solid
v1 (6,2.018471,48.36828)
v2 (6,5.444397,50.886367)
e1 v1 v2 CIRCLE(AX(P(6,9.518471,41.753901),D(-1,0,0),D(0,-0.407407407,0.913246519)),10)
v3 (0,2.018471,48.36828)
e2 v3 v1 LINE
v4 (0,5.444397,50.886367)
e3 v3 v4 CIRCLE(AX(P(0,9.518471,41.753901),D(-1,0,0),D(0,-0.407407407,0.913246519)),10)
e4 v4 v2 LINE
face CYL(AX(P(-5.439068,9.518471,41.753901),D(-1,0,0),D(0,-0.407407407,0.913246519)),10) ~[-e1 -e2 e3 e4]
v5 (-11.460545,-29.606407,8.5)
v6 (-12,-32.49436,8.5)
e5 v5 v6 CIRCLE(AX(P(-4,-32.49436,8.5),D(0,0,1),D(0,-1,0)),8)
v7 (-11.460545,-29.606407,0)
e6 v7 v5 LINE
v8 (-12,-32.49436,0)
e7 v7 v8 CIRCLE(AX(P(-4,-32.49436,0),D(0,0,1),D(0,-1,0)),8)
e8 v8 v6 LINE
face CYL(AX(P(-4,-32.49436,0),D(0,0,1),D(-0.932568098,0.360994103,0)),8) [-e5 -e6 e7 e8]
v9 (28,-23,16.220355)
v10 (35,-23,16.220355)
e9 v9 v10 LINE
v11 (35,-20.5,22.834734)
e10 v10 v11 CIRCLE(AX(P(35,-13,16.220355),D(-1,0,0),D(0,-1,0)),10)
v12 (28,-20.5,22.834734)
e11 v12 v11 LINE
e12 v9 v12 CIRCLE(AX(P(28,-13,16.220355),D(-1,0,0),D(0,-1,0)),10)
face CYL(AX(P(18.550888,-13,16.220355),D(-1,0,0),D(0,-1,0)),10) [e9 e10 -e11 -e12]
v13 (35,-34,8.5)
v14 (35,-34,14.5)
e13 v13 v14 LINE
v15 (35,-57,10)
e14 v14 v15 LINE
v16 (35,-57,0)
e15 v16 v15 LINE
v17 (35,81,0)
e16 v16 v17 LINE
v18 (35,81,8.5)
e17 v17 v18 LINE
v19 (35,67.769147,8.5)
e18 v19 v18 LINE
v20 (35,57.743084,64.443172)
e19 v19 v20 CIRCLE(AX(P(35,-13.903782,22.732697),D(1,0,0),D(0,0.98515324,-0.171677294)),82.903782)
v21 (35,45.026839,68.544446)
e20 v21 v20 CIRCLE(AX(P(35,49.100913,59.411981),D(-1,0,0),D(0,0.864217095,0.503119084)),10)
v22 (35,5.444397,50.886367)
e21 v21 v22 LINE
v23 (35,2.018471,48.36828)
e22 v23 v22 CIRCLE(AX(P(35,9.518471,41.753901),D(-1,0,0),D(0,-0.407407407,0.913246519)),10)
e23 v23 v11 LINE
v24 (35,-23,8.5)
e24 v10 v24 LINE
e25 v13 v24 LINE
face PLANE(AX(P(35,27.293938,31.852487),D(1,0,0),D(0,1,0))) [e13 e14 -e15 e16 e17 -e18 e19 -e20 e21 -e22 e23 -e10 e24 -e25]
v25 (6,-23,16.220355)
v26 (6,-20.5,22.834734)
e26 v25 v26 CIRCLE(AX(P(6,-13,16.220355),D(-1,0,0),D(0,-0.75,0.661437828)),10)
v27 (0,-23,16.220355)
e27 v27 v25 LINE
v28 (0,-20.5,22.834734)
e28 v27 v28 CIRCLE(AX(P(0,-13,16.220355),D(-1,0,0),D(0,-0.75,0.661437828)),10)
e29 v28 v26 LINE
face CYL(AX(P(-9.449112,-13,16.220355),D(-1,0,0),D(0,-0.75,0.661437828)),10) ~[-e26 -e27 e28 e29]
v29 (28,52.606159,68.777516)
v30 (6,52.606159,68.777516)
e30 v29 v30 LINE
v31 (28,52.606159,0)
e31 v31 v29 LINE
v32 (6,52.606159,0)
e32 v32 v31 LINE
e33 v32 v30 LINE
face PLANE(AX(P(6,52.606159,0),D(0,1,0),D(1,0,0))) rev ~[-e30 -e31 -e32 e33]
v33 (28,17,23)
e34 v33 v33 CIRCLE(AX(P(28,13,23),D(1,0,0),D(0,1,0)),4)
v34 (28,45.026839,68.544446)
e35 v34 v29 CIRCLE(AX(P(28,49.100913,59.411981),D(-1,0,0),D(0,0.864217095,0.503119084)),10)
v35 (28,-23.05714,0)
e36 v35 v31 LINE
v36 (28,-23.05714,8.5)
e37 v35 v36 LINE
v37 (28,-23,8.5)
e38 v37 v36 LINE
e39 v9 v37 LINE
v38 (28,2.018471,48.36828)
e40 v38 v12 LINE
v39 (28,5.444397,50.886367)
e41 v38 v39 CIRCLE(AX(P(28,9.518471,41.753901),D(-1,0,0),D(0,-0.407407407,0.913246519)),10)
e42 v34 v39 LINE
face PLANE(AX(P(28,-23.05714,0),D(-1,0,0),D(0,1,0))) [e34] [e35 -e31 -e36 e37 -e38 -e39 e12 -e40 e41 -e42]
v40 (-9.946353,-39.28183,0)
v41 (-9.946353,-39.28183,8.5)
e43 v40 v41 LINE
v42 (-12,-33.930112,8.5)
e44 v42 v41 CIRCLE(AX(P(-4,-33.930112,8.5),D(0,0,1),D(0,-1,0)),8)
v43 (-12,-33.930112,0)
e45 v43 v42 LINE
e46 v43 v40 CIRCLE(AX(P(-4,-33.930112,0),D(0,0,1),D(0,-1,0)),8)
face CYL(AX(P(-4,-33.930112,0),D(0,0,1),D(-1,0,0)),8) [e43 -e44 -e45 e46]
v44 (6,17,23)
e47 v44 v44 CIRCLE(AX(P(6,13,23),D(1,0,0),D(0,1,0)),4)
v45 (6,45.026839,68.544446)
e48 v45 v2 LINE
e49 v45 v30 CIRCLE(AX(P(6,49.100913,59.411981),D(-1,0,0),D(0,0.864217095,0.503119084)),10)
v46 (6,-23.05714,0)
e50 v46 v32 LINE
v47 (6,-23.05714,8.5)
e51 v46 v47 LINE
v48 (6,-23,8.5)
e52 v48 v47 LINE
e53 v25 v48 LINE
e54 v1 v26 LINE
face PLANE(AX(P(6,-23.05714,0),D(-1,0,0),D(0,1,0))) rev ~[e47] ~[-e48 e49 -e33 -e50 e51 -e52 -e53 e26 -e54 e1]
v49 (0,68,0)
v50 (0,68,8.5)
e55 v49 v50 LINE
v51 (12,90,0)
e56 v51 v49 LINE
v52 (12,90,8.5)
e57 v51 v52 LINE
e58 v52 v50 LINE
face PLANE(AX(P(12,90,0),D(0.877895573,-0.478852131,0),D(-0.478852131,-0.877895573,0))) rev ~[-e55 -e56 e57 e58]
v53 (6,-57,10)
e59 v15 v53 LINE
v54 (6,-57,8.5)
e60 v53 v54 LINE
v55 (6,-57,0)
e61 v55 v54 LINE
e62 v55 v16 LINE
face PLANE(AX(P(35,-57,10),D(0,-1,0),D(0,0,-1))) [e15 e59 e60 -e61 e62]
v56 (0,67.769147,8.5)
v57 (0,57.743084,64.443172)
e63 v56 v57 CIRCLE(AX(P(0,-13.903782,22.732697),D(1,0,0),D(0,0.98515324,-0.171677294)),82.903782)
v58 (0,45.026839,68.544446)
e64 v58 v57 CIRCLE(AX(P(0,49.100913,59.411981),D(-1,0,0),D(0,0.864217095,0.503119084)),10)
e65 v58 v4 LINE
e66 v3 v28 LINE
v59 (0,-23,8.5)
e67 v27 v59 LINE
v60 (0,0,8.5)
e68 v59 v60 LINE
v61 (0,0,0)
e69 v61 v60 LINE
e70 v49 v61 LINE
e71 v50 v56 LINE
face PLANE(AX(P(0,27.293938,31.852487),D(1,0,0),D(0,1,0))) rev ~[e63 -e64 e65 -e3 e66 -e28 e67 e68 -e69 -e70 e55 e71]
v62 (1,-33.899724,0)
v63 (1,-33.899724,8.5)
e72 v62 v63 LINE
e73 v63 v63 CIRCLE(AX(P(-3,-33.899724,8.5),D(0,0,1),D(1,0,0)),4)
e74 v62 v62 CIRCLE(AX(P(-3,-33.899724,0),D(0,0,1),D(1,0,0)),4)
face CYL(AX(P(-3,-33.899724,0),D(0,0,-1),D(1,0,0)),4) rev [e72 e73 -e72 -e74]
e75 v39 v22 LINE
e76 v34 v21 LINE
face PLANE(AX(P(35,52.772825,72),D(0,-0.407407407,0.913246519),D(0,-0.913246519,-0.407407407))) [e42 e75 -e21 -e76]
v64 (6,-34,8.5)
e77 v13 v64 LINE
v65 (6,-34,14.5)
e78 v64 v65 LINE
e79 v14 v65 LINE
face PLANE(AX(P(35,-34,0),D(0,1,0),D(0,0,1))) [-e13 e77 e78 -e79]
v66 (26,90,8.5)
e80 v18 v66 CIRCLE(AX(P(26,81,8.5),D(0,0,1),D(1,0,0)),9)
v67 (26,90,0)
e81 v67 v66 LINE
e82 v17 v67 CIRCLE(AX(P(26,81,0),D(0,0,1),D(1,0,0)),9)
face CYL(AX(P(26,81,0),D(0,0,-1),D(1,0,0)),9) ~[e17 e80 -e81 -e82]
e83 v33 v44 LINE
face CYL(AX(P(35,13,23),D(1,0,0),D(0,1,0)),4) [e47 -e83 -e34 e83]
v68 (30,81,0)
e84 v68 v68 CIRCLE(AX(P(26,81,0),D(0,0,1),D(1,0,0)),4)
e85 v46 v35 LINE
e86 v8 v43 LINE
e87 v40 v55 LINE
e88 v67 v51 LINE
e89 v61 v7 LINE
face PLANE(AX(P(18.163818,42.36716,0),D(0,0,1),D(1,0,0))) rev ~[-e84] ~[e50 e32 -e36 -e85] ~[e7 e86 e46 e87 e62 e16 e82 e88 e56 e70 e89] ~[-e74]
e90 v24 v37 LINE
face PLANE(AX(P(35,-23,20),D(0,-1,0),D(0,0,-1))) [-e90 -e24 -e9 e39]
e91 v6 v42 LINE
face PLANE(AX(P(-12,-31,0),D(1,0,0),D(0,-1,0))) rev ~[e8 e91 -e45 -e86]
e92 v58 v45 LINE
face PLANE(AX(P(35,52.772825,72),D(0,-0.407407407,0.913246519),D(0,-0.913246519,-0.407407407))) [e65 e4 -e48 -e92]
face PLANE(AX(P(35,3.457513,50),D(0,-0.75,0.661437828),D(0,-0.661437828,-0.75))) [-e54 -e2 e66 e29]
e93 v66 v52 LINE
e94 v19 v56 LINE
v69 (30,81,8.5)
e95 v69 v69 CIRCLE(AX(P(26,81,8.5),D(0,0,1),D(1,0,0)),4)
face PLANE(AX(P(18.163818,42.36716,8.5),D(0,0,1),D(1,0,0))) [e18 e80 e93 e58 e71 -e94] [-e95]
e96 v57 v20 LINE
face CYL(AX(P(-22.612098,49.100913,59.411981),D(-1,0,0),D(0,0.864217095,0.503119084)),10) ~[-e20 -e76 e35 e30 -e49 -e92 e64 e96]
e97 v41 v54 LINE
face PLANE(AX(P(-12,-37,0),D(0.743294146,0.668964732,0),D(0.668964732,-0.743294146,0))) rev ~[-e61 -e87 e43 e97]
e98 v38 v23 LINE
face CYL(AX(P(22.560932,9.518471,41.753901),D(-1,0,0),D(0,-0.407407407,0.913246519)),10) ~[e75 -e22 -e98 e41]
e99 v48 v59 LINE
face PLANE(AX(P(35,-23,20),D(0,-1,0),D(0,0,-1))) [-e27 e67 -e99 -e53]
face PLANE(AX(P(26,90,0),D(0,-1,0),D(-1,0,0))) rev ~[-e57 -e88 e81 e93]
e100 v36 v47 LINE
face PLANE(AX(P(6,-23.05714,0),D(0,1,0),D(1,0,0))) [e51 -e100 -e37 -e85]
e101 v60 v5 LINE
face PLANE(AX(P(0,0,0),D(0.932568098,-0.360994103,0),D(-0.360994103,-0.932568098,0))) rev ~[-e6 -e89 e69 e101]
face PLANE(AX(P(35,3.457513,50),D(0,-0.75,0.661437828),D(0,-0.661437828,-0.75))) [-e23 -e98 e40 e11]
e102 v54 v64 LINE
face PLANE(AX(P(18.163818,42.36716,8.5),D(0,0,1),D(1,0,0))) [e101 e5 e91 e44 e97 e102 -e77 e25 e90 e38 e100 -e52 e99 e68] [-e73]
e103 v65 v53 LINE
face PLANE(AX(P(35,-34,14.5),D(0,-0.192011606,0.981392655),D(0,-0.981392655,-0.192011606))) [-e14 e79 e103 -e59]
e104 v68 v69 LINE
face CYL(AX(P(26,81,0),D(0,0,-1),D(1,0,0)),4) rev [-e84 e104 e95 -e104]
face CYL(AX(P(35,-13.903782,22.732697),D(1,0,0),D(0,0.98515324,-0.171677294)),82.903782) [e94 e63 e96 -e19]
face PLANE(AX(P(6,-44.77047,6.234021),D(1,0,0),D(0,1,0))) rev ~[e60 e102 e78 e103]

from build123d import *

# Parameters (mm, degrees)
F0_R         = 4
F1_DEPTH     = 8.5
F2_R         = 8
F4_DEPTH     = 29
F5_R         = 4
F6_DEPTH     = 35
F7_W         = 22
F7_H         = 75.6632985204
F8_DEPTH     = 72.001
F9_DEPTH     = 35
F10_T1_DEPTH = 80.2241965153
F10_T3_DEPTH = 17.8781354595
F10_T5_DEPTH = 16.8781354595
F10_T7_DEPTH = 25.8982236505
F10_T9_DEPTH = 24.8982236505


# Not quite as in the source:
# - a fillet or chamfer that OpenCascade refuses, or shapes differently, is made with other operations: its cross-section is extruded or revolved along the edge and cut away or added


with BuildPart() as f1:
    # F0 (on Top) → F1 (new body)
    with BuildSketch(Plane.XY):
        with BuildLine():
            Line((0, 68), (0, 0))
            Line((0, 0), (35, 0))
            Line((35, 0), (35, 68))
            Line((35, 68), (35, 81))
            ThreePointArc((35, 81), (32.3639610307, 87.3639610307), (26, 90))
            Line((26, 90), (12, 90))
            Line((12, 90), (0, 68))
        make_face()
        with Locations((26, 81)):
            Circle(F0_R, mode=Mode.SUBTRACT)
        Polygon((35, 0), (0, 0), (-12, -31), (-12, -37), (6, -57), (35, -57), align=None)
        with Locations((-3, -33.8997244835)):
            Circle(F0_R, mode=Mode.SUBTRACT)
    extrude(amount=F1_DEPTH)

    # F2
    f2_edges = [f1.edges().sort_by_distance(p)[0] for p in [
        (-12, -37, 4.25),
        (-12, -31, 4.25),
    ]]
    fillet(f2_edges, radius=F2_R)

    # F3 (on face) → F4 (join, through all)
    with BuildSketch(Plane.YZ.offset(35)):
        Polygon((-57, 10), (-57, 0), (-34, 0), (-34, 14.5), align=None)
    extrude(amount=-F4_DEPTH)

    # F5 (on face) → F6 (join, through all)
    with BuildSketch(Plane.YZ.offset(35)):
        with BuildLine():
            Line((-23, 20), (-23, 8.5))
            Line((-23, 8.5), (67.7691474557, 8.5))
            ThreePointArc((67.7691474557, 8.5), (66.7805333738, 41.7873112781), (52.7728251344, 72))
            Line((52.7728251344, 72), (3.4575131106, 50))
            Line((3.4575131106, 50), (-23, 20))
        make_face()
        with Locations((13, 23)):
            Circle(F5_R, mode=Mode.SUBTRACT)
    extrude(amount=-F6_DEPTH)

    # F7 (on Top) → F8 (cut, through all)
    with BuildSketch(Plane.XY):
        with Locations((17, 14.7745097056)):
            Rectangle(F7_W, F7_H)
    extrude(amount=F8_DEPTH, mode=Mode.SUBTRACT)

    # F5 (on face) → F9 (join, through all)
    with BuildSketch(Plane.YZ.offset(35)):
        with Locations((13, 23)):
            Circle(F5_R)
    extrude(amount=-F9_DEPTH)

    # F10: fillet of radius 10 on 5 edges, made by hand

    # F10_s2 → F10_t1 (cut)
    with BuildSketch(Plane.YZ.offset(-22.6120982577)):
        with BuildLine():
            ThreePointArc((57.7430836083, 64.4431720463), (52.1704386948, 68.9292292294), (45.0268385832, 68.5444463974))
            Line((45.0268385832, 68.5444463974), (52.7728251344, 72))
            ThreePointArc((52.7728251344, 72), (55.3610878115, 68.2894186982), (57.7430836083, 64.4431720463))
        make_face()
    extrude(amount=F10_T1_DEPTH, mode=Mode.SUBTRACT)

    # F10_s4 → F10_t3 (cut)
    with BuildSketch(Plane.YZ.offset(22.5609322702)):
        with BuildLine():
            ThreePointArc((5.4443969789, 50.886366593), (3.5960570103, 49.8115072456), (2.0184710529, 48.3682796811))
            Line((2.0184710529, 48.3682796811), (3.4575131106, 50))
            Line((3.4575131106, 50), (5.4443969789, 50.886366593))
        make_face()
    extrude(amount=F10_T3_DEPTH, mode=Mode.SUBTRACT)

    # F10_s6 → F10_t5 (cut)
    with BuildSketch(Plane.YZ.offset(-5.4390677298)):
        with BuildLine():
            ThreePointArc((5.4443969789, 50.886366593), (3.5960570103, 49.8115072456), (2.0184710529, 48.3682796811))
            Line((2.0184710529, 48.3682796811), (3.4575131106, 50))
            Line((3.4575131106, 50), (5.4443969789, 50.886366593))
        make_face()
    extrude(amount=F10_T5_DEPTH, mode=Mode.SUBTRACT)

    # F10_s8 → F10_t7 (cut)
    with BuildSketch(Plane.YZ.offset(18.5508881748)):
        with BuildLine():
            ThreePointArc((-23, 16.2203552699), (-22.3541434669, 19.7558891758), (-20.5, 22.8347335476))
            Line((-20.5, 22.8347335476), (-23, 20))
            Line((-23, 20), (-23, 16.2203552699))
        make_face()
    extrude(amount=F10_T7_DEPTH, mode=Mode.SUBTRACT)

    # F10_s10 → F10_t9 (cut)
    with BuildSketch(Plane.YZ.offset(-9.4491118252)):
        with BuildLine():
            ThreePointArc((-20.5, 22.8347335476), (-22.3541434669, 19.7558891758), (-23, 16.2203552699))
            Line((-23, 16.2203552699), (-23, 20))
            Line((-23, 20), (-20.5, 22.8347335476))
        make_face()
    extrude(amount=F10_T9_DEPTH, mode=Mode.SUBTRACT)


solid = f1.part
